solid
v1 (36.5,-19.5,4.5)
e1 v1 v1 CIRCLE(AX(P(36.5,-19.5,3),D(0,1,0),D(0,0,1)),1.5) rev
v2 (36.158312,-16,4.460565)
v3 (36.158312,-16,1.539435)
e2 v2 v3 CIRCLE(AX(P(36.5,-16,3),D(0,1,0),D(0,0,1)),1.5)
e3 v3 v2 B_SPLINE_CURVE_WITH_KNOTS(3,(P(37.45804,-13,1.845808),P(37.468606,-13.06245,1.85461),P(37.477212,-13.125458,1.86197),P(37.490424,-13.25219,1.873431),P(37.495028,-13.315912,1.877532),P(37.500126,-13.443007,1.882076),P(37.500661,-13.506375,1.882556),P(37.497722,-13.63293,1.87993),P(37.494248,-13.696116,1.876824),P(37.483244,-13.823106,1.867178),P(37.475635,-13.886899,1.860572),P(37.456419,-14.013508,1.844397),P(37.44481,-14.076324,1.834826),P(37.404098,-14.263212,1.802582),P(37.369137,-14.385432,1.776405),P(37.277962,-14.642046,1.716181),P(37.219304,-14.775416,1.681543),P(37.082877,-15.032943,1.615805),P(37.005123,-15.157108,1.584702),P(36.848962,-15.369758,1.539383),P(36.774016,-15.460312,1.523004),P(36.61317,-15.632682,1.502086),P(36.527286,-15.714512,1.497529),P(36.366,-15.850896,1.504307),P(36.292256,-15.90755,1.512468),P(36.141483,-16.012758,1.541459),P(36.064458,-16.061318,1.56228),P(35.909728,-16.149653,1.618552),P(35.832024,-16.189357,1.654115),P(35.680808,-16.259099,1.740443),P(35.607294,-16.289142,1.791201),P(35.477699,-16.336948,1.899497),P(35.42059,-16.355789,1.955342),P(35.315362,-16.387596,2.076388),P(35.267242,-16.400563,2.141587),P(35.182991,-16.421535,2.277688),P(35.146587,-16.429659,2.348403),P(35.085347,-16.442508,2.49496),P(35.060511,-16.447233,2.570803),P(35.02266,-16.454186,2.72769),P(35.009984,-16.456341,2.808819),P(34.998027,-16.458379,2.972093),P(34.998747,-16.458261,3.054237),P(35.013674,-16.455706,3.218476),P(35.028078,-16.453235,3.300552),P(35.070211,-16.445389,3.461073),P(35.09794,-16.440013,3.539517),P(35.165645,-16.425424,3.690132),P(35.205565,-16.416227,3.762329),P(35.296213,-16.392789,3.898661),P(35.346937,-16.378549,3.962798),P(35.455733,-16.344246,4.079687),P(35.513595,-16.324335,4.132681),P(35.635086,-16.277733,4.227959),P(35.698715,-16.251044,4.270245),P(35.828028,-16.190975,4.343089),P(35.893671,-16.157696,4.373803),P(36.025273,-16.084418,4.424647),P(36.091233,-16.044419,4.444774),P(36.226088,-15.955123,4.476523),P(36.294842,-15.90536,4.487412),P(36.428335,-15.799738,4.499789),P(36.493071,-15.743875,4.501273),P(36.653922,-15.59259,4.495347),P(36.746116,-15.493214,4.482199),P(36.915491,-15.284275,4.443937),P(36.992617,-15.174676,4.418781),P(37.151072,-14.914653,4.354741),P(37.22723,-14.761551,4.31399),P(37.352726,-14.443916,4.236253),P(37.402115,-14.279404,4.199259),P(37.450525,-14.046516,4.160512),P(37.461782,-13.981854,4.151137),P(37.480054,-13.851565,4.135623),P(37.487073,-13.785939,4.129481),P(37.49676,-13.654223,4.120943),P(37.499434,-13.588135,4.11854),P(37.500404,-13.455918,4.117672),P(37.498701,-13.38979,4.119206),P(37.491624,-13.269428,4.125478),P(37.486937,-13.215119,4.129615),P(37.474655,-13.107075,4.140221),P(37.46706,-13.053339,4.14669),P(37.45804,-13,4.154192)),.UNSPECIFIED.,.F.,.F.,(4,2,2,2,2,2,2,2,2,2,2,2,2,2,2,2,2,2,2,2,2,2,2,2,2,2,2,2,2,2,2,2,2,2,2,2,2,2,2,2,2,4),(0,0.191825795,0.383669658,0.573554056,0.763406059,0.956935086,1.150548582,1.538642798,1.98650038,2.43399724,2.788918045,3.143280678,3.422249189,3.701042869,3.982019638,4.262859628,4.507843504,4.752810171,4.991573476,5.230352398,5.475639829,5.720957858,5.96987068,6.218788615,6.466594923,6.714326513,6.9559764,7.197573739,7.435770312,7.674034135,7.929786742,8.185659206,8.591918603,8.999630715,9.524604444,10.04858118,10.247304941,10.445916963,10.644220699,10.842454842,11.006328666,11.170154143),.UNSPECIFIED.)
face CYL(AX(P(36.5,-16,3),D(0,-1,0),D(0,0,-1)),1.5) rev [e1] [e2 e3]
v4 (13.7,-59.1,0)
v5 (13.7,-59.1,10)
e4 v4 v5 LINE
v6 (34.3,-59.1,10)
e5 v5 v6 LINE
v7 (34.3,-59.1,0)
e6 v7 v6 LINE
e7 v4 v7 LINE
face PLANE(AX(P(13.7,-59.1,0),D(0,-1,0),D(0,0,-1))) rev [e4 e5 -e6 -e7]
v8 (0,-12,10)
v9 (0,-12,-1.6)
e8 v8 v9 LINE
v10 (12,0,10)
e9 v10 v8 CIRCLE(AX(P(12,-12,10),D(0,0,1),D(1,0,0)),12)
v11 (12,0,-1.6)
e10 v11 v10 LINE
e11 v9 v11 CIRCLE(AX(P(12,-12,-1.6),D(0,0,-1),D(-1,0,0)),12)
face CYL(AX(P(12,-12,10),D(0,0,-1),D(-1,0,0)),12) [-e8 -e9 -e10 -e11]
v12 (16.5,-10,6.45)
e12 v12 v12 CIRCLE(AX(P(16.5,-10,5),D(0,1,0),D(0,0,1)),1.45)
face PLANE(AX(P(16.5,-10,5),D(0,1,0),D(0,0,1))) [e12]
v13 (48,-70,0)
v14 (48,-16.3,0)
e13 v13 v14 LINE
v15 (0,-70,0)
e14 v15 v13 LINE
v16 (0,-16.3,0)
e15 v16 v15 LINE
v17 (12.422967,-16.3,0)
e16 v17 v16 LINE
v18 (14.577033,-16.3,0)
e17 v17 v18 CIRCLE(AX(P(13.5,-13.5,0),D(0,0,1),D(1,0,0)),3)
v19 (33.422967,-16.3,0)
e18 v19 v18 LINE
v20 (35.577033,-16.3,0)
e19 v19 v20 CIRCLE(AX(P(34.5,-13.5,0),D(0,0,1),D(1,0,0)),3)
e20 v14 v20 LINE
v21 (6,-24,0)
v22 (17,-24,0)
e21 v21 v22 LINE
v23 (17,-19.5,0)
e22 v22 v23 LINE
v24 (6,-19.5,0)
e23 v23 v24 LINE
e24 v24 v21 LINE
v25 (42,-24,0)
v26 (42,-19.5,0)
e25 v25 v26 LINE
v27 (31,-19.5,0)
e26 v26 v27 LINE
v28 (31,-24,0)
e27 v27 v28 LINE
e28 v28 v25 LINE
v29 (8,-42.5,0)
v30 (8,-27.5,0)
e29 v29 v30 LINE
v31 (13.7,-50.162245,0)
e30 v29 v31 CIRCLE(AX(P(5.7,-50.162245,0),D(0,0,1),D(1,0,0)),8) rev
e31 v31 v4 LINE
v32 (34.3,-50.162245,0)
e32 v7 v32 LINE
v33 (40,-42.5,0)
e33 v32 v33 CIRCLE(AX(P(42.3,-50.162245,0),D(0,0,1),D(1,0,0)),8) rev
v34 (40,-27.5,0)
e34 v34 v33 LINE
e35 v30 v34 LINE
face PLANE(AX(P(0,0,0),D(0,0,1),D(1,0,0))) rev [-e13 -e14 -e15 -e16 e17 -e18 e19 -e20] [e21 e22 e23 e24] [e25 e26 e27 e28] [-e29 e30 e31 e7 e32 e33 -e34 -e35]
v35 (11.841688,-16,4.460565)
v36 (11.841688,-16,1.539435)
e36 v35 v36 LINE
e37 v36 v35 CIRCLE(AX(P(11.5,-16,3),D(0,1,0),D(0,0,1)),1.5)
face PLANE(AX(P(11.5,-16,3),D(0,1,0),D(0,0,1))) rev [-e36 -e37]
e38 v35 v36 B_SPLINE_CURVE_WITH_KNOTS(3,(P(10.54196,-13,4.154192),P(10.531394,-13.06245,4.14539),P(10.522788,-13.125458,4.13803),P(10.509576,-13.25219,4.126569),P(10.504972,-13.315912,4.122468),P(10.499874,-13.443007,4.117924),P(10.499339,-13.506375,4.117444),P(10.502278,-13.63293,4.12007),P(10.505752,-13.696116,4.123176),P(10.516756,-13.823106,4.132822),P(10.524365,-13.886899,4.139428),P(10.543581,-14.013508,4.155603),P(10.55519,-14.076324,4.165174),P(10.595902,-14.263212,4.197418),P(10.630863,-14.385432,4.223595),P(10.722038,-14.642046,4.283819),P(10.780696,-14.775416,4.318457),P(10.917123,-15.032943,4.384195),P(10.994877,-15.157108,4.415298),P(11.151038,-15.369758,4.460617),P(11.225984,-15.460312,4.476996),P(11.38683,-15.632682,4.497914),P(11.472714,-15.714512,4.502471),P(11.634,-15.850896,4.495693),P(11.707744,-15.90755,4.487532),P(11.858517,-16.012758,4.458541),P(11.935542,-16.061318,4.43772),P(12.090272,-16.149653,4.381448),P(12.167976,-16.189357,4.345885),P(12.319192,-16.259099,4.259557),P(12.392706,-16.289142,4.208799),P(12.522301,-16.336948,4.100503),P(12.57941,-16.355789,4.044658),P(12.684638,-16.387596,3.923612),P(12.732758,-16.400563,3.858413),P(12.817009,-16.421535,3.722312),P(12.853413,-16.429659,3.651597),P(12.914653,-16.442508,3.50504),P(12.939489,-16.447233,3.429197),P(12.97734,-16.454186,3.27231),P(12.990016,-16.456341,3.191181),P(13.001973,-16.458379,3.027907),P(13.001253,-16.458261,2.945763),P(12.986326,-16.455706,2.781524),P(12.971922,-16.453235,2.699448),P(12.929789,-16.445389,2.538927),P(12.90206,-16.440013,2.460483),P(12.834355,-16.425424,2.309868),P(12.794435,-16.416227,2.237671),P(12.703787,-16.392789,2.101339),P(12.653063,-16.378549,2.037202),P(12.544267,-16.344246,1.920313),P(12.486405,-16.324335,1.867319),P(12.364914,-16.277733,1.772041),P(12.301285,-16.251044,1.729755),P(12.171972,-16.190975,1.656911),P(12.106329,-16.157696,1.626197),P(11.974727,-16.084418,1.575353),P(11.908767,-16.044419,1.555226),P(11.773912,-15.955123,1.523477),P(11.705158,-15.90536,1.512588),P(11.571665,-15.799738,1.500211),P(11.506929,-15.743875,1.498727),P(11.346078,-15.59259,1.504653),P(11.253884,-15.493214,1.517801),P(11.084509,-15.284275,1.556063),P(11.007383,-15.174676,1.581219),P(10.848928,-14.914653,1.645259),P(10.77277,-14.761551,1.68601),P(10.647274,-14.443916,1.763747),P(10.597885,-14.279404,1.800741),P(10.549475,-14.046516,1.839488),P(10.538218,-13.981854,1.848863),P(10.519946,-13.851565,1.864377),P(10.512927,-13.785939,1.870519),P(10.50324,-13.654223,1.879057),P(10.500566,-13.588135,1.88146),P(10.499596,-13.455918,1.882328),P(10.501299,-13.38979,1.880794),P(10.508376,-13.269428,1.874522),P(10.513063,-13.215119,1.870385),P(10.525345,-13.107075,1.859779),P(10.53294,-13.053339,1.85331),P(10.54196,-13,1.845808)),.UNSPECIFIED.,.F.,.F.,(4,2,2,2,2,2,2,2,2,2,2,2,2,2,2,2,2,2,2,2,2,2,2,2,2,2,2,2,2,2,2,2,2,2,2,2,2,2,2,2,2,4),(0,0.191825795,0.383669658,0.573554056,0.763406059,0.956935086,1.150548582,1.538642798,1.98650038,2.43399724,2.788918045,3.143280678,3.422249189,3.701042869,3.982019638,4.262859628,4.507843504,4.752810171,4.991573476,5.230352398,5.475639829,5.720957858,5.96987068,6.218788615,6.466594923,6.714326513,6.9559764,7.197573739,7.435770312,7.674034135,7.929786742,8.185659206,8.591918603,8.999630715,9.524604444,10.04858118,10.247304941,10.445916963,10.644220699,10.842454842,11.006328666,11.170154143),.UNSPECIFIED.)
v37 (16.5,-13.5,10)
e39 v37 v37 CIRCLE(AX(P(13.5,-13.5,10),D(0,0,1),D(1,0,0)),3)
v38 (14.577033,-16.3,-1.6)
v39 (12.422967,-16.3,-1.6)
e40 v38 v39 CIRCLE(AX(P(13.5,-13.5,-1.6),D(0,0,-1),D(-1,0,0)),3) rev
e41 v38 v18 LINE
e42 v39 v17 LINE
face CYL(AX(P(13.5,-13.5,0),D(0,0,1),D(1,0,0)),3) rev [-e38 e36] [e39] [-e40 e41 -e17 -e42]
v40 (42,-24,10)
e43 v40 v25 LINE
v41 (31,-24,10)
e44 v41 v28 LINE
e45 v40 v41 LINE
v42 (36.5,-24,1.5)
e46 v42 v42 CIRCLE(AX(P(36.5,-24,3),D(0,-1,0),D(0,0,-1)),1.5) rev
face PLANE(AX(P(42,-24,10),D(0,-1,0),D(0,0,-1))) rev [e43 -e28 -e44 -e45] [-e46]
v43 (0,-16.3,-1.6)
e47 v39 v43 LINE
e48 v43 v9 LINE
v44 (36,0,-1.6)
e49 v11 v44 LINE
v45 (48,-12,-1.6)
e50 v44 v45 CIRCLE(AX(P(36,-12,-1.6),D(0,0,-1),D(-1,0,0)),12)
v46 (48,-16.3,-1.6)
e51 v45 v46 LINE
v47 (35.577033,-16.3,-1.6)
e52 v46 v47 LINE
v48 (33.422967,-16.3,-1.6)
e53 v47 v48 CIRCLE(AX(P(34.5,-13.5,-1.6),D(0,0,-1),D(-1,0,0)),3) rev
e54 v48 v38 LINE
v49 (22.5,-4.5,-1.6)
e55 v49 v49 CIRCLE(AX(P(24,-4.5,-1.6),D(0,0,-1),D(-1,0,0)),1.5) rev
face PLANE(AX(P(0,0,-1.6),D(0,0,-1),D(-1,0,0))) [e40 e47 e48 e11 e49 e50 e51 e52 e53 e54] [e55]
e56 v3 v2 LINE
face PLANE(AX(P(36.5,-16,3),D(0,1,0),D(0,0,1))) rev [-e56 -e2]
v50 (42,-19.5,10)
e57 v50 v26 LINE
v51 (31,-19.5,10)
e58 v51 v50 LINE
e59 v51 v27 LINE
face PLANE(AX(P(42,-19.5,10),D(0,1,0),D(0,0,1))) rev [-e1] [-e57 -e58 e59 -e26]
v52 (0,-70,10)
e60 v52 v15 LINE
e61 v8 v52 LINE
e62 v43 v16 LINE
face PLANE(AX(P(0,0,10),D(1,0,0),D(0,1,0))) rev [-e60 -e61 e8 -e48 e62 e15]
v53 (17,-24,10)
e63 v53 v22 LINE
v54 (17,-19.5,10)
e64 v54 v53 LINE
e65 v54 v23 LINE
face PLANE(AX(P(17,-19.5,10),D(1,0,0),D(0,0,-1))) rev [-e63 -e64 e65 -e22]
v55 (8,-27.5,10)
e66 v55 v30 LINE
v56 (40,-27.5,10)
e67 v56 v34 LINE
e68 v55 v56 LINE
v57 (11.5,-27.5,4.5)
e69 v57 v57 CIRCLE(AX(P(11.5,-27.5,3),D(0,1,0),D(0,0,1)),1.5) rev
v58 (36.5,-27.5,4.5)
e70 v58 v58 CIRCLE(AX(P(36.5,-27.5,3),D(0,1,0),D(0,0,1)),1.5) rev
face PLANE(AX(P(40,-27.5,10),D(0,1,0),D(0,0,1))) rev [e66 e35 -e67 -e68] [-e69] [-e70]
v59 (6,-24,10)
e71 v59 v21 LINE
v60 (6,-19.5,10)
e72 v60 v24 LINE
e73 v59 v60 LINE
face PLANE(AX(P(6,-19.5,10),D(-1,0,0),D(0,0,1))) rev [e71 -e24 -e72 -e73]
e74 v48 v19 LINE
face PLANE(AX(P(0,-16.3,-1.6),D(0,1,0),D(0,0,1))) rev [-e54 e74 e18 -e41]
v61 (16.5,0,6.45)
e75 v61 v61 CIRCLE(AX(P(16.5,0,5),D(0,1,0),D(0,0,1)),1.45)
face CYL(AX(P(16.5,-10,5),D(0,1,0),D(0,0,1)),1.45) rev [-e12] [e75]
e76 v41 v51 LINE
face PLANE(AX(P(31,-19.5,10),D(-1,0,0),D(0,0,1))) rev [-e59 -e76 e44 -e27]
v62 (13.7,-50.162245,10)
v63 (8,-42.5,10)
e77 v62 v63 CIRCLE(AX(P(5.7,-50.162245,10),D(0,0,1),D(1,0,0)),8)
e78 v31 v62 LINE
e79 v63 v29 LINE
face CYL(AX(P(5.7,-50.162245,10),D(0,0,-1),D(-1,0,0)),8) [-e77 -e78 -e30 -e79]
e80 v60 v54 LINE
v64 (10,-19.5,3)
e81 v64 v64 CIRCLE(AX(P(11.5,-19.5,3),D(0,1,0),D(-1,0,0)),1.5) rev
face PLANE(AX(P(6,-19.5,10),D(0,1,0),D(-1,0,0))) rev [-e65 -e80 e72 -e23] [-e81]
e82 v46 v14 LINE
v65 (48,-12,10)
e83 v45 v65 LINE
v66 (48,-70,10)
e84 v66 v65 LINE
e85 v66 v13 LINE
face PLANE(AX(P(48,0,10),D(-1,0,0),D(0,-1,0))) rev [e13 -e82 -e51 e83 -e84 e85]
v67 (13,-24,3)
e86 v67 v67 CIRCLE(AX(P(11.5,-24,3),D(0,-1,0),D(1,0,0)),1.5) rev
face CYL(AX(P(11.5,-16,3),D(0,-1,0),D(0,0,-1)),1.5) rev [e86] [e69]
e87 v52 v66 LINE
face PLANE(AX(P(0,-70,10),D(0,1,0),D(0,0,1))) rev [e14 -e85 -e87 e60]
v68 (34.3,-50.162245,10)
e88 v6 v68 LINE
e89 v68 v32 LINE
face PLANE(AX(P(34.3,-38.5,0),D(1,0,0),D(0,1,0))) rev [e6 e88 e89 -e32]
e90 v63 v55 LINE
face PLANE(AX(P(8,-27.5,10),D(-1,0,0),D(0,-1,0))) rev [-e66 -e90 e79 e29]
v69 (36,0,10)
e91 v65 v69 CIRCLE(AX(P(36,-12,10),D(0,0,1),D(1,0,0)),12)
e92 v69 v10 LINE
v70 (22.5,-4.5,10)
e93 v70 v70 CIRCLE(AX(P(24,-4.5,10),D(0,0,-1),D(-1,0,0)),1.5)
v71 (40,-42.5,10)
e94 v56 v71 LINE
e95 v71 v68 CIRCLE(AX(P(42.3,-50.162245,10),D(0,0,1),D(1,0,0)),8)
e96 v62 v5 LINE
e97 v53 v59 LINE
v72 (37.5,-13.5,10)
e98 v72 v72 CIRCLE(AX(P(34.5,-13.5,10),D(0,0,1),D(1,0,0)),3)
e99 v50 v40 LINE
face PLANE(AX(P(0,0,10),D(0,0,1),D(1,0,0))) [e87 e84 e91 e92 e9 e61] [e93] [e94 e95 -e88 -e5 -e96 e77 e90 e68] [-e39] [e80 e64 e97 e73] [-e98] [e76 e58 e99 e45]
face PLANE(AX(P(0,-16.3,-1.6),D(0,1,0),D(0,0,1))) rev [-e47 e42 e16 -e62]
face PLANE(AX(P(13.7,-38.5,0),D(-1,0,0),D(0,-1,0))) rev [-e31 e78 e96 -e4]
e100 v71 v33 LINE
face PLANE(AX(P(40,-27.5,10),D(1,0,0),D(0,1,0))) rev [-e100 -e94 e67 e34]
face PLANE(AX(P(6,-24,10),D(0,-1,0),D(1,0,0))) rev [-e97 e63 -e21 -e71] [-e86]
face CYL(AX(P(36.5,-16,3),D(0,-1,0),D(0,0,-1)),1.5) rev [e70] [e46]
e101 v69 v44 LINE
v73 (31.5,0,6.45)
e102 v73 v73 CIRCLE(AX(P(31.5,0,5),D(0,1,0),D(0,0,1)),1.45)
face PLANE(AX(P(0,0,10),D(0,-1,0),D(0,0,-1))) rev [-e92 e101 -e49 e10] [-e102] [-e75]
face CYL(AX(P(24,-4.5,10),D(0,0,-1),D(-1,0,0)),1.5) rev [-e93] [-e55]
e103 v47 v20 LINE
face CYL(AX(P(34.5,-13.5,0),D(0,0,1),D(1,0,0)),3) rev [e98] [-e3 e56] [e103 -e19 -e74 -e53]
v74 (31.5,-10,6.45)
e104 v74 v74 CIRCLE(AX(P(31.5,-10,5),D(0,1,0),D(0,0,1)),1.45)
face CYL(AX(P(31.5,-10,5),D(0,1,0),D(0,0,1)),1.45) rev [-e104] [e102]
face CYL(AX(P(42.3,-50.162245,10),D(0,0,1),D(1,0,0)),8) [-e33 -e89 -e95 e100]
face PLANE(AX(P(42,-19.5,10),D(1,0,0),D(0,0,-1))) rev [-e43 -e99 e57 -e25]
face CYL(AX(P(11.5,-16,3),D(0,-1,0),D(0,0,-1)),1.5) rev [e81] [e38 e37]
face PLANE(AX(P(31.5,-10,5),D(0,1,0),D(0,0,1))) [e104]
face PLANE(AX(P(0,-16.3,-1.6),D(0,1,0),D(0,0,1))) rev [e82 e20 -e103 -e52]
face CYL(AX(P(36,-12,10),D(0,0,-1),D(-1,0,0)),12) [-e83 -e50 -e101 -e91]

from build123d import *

# Parameters (mm, degrees)
SKETCH1_W               = 48
SKETCH1_H               = 70
BOSS_EXTRUDE1_DEPTH     = 10
SKETCH2_R               = 3
CUT_EXTRUDE1_DEPTH      = 86.463442477
SKETCH3_W               = 20.6
SKETCH3_H               = 20.6
CUT_EXTRUDE2_DEPTH      = 86.463442477
FILLET1_R               = 12
SKETCH4_R               = 1.5
CUT_EXTRUDE3_DEPTH      = 86.463442477
SKETCH5_R               = 1.45
CUT_EXTRUDE4_DEPTH      = 10
CUT_EXTRUDE5_DEPTH      = 86.463442477
CUT_EXTRUDE5_DEPTH_BACK = 86.463442477
SKETCH7_W               = 11
SKETCH7_H               = 4.5
SKETCH11_W              = 32
SKETCH11_H              = 15
CUT_EXTRUDE6_DEPTH      = 86.463442477
CUT_EXTRUDE7_DEPTH      = 8
CUT_EXTRUDE7_DEPTH_BACK = 5
SKETCH12_R              = 1.5
SKETCH13_R              = 1.5
BOSS_EXTRUDE4_DEPTH     = 1.6
FILLET2_R               = 8


with BuildPart() as part:
    # Sketch1 → Boss-Extrude1 (new body)
    with BuildSketch(Plane.XY):
        with Locations((24, -35)):
            Rectangle(SKETCH1_W, SKETCH1_H)
    extrude(amount=BOSS_EXTRUDE1_DEPTH)

    # Sketch2 → Cut-Extrude1 (cut, through all)
    with BuildSketch(Plane.XY.offset(10)):
        with Locations((13.5, -13.5)):
            Circle(SKETCH2_R)
        with Locations((34.5, -13.5)):
            Circle(SKETCH2_R)
    extrude(amount=-CUT_EXTRUDE1_DEPTH, mode=Mode.SUBTRACT)

    # Sketch3 → Cut-Extrude2 (cut, through all)
    with BuildSketch(Plane.XY.offset(10)):
        with Locations((24, -48.8)):
            Rectangle(SKETCH3_W, SKETCH3_H)
    extrude(amount=-CUT_EXTRUDE2_DEPTH, mode=Mode.SUBTRACT)

    # Fillet1
    fillet1_edges = [part.edges().sort_by_distance(p)[0] for p in [
        (0, 0, 5),
        (48, 0, 5),
    ]]
    fillet(fillet1_edges, radius=FILLET1_R)

    # Sketch4 → Cut-Extrude3 (cut, through all)
    with BuildSketch(Plane(origin=(0, 0, 0), x_dir=(-1, 0, 0), z_dir=(0, 0, -1))):
        with Locations((-24, -4.5)):
            Circle(SKETCH4_R)
    extrude(amount=-CUT_EXTRUDE3_DEPTH, mode=Mode.SUBTRACT)

    # Sketch5 → Cut-Extrude4 (cut)
    with BuildSketch(Plane(origin=(0, 0, 0), x_dir=(1, 0, 0), z_dir=(0, 1, 0))):
        with Locations(Location((16.5, -5, 0), (0, 0, 270))):
            Circle(SKETCH5_R)
        with Locations(Location((31.5, -5, 0), (0, 0, 270))):
            Circle(SKETCH5_R)
    extrude(amount=-CUT_EXTRUDE4_DEPTH, mode=Mode.SUBTRACT)

    # Sketch7 → Cut-Extrude5 (cut, two sides: drawn at the far end of the back side and taken through both)
    with BuildSketch(Plane(origin=(0, 0, 0), x_dir=(-1, 0, 0), z_dir=(0, 0, -1)).offset(-CUT_EXTRUDE5_DEPTH_BACK)):
        with Locations((-36.5, -21.75)):
            Rectangle(SKETCH7_W, SKETCH7_H)
        with Locations((-11.5, -21.75)):
            Rectangle(SKETCH7_W, SKETCH7_H)
    extrude(amount=CUT_EXTRUDE5_DEPTH + CUT_EXTRUDE5_DEPTH_BACK, mode=Mode.SUBTRACT)

    # Sketch11 → Cut-Extrude6 (cut, through all)
    with BuildSketch(Plane(origin=(0, 0, 0), x_dir=(-1, 0, 0), z_dir=(0, 0, -1))):
        with Locations((-24, -35)):
            Rectangle(SKETCH11_W, SKETCH11_H)
    extrude(amount=-CUT_EXTRUDE6_DEPTH, mode=Mode.SUBTRACT)

    # Sketch12 → Cut-Extrude7 (cut, two sides: drawn at the far end of the back side and taken through both)
    with BuildSketch(Plane(origin=(0, -24, 0), x_dir=(1, 0, 0), z_dir=(0, 1, 0)).offset(-CUT_EXTRUDE7_DEPTH_BACK)):
        with Locations(Location((36.5, -3, 0), (0, 0, 90))):
            Circle(SKETCH12_R)
        with Locations((11.5, -3)):
            Circle(SKETCH12_R)
    extrude(amount=CUT_EXTRUDE7_DEPTH + CUT_EXTRUDE7_DEPTH_BACK, mode=Mode.SUBTRACT)

    # Sketch13 → Boss-Extrude4 (add)
    with BuildSketch(Plane(origin=(0, 0, 0), x_dir=(-1, 0, 0), z_dir=(0, 0, -1))):
        with BuildLine():
            Line((-48, -12), (-48, -16.3))
            Line((-48, -16.3), (-35.577032961, -16.3))
            ThreePointArc((-35.577032961, -16.3), (-36.198367027, -11.027036304), (-31.5, -13.5))
            ThreePointArc((-31.5, -13.5), (-32.027036304, -15.198367027), (-33.422967039, -16.3))
            Line((-33.422967039, -16.3), (-14.577032961, -16.3))
            ThreePointArc((-14.577032961, -16.3), (-15.198367027, -11.027036304), (-10.5, -13.5))
            ThreePointArc((-10.5, -13.5), (-11.027036304, -15.198367027), (-12.422967039, -16.3))
            Line((-12.422967039, -16.3), (0, -16.3))
            Line((0, -16.3), (0, -12))
            ThreePointArc((0, -12), (-3.514718626, -3.514718626), (-12, 0))
            Line((-12, 0), (-36, 0))
            ThreePointArc((-36, 0), (-44.485281374, -3.514718626), (-48, -12))
        make_face()
        with Locations((-24, -4.5)):
            Circle(SKETCH13_R, mode=Mode.SUBTRACT)
    extrude(amount=BOSS_EXTRUDE4_DEPTH)

    # Fillet2
    # the kernel refuses this fillet: 8 mm, written as the material it takes off along each edge
    with BuildSketch(Plane(origin=(13.7, -42.5, -19.155612754), x_dir=(-1, 0, 0), z_dir=(0, 0, 1))) as fillet2_piece_1:
        with BuildLine():
            CenterArc((8, 7.662245102), FILLET2_R, 180, 73.291656284)
            Line((0, 7.662245102), (-0.16, 7.662245102))
            Line((-0.16, 7.662245102), (-0.16, 0))
            Line((-0.16, 0), (0, -0.16))
            ThreePointArc((0, -0.16), (2.85, -0.16), (5.654, -0.153244902))
            Line((5.654, -0.153244902), (5.7, 0))
        make_face()
    extrude(amount=48.311225509, mode=Mode.SUBTRACT)
    with BuildSketch(Plane(origin=(34.3, -42.5, 29.155612754), x_dir=(0, -1, 0), z_dir=(0, 0, -1))) as fillet2_piece_2:
        with BuildLine():
            CenterArc((7.662245102, -8), FILLET2_R, 90, 73.291656284)
            Line((0, -5.7), (-0.153244902, -5.654))
            ThreePointArc((-0.153244902, -5.654), (-0.16, -2.85), (-0.16, 0))
            Line((-0.16, 0), (0, 0.16))
            Line((0, 0.16), (7.662245102, 0.16))
            Line((7.662245102, 0.16), (7.662245102, 0))
        make_face()
    extrude(amount=48.311225509, mode=Mode.SUBTRACT)


solid = part.part
